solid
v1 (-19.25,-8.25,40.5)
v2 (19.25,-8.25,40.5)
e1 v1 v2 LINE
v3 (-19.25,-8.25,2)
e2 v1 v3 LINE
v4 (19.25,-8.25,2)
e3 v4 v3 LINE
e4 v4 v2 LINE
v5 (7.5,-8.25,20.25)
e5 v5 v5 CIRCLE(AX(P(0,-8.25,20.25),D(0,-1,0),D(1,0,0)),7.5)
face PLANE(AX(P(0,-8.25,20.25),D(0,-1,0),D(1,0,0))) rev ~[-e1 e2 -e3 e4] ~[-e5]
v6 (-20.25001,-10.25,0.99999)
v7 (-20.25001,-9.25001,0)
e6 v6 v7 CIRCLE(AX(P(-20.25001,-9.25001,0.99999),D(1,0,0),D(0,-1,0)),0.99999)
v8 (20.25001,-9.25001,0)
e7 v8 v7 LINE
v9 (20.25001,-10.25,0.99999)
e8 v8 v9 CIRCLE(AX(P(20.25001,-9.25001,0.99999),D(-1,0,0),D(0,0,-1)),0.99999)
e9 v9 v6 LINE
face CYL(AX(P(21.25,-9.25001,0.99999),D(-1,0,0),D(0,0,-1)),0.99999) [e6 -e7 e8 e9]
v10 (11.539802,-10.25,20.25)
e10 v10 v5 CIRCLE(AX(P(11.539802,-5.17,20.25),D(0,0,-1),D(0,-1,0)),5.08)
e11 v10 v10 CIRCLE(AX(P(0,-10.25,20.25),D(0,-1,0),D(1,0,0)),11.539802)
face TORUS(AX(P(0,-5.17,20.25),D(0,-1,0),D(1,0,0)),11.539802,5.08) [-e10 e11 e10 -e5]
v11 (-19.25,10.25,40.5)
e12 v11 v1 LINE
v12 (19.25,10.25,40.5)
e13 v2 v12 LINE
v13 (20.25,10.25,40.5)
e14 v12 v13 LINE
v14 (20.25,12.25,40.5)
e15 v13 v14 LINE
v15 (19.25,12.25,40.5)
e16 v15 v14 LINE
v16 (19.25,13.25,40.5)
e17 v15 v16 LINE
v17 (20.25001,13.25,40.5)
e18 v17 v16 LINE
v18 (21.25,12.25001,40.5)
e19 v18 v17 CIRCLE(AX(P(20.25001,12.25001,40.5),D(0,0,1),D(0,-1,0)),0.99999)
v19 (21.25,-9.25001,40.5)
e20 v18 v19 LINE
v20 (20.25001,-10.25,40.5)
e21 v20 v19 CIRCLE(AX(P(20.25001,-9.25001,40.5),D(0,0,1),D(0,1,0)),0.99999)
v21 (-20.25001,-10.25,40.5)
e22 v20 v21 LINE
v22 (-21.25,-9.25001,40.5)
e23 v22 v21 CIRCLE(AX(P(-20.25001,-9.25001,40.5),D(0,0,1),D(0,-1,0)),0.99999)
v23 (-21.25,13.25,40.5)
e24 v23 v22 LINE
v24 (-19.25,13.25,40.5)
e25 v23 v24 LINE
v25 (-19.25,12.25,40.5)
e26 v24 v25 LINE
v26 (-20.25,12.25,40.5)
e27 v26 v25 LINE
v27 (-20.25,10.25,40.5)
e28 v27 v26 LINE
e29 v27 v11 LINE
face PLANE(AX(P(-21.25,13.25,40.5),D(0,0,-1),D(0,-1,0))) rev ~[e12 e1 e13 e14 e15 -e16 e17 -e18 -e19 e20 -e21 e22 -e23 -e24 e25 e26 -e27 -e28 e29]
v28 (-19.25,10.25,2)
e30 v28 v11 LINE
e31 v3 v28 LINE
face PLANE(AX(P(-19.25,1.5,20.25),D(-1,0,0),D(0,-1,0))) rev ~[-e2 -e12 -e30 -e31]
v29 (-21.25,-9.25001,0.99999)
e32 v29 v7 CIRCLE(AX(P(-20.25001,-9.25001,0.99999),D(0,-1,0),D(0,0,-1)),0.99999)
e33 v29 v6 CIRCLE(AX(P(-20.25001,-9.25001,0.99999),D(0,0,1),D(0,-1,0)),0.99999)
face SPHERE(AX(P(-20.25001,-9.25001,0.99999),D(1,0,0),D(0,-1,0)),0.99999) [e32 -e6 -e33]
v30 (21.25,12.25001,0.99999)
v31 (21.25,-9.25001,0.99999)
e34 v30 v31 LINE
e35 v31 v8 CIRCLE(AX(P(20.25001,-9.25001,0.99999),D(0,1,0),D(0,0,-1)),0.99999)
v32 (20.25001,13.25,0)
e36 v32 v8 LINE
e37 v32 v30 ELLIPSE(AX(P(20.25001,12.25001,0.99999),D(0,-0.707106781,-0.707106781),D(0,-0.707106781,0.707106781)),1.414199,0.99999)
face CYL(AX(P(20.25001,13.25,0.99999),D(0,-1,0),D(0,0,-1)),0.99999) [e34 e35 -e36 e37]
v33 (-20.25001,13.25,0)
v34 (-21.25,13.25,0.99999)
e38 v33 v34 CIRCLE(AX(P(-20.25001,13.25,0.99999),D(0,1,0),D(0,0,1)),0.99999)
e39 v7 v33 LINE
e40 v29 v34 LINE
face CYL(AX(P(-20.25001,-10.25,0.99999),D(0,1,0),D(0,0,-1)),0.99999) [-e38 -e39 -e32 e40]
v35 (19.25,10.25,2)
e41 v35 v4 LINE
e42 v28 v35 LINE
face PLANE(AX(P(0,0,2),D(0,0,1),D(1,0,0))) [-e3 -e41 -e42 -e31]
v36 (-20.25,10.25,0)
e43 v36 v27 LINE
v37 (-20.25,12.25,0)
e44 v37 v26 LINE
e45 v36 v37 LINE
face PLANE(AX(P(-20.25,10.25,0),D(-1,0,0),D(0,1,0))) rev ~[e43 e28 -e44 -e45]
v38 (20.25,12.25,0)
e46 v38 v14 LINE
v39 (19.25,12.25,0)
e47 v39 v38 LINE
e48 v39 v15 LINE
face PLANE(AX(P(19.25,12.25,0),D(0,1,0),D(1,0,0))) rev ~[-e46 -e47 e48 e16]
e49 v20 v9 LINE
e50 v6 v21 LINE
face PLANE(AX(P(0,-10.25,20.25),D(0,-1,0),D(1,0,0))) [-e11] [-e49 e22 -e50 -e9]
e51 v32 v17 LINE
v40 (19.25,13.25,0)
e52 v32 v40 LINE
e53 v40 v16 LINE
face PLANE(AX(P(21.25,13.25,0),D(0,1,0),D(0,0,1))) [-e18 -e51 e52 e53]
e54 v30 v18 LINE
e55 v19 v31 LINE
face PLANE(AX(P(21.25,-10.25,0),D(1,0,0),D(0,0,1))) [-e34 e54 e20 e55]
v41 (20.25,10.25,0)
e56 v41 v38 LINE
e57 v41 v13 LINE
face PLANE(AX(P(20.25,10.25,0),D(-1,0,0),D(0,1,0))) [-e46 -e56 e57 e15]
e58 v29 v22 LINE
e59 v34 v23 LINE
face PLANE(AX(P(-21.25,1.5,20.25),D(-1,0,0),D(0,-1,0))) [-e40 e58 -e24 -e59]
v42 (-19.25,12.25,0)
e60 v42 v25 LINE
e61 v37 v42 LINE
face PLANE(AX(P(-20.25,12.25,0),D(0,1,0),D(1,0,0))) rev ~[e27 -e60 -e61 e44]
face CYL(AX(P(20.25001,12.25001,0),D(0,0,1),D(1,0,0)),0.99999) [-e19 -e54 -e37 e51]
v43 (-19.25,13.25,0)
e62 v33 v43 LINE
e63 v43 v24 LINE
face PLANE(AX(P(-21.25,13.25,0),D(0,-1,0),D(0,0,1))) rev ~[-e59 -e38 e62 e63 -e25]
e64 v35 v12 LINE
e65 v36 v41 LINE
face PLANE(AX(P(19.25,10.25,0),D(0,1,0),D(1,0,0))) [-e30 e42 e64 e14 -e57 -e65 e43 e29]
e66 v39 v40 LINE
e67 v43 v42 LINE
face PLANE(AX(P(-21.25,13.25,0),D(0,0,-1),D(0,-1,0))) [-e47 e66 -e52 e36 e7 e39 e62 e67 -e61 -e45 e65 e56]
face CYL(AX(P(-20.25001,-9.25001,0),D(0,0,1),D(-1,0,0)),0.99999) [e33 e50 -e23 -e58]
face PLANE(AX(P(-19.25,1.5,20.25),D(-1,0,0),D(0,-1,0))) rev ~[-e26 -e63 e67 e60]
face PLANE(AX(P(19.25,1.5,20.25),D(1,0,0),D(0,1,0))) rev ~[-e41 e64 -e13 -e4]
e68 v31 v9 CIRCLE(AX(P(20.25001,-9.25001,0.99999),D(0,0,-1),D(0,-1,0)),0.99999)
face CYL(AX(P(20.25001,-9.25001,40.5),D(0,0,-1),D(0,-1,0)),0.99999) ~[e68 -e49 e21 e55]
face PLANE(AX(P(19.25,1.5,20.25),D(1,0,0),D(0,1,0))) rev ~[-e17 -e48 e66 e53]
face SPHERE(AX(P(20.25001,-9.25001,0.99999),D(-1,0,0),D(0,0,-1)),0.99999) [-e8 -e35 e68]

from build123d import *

# Parameters (mm, degrees)
F2_W      = 42.5
F2_H      = 40.5
F2_R      = 7.5
F8_DEPTH  = 2
F6_W      = 23.5
F6_H      = 40.5
F9_DEPTH  = 2
F5_W      = 23.5
F5_H      = 40.5
F10_DEPTH = 2
F0_W      = 42.5
F0_H      = 20.5
F11_DEPTH = 2
F7_W      = 1
F7_H      = 2
F12_DEPTH = 38.5
F13_DEPTH = 40.5
F14_R     = 0.99999


# Not quite as in the source:
# - a fillet or chamfer that OpenCascade refuses, or shapes differently, is made with other operations: its cross-section is extruded or revolved along the edge and cut away or added
# - a fillet or chamfer is up to 0.001 mm smaller than in the source, because OpenCascade refuses the exact size


with BuildPart() as f8:
    # F2 (on line) → F8 (new body)
    with BuildSketch(Plane.XZ.offset(10.25)):
        with Locations((0, 20.25)):
            Rectangle(F2_W, F2_H)
        with Locations((0, 20.25)):
            Circle(F2_R, mode=Mode.SUBTRACT)
    extrude(amount=-F8_DEPTH)

    # F6 (on line) → F9 (join)
    with BuildSketch(Plane(origin=(-21.25, 0, 0), x_dir=(0, -1, 0), z_dir=(-1, 0, 0))):
        with Locations((-1.5, 20.25)):
            Rectangle(F6_W, F6_H)
    extrude(amount=-F9_DEPTH)

    # F5 (on line) → F10 (join)
    with BuildSketch(Plane.YZ.offset(21.25)):
        with Locations((1.5, 20.25)):
            Rectangle(F5_W, F5_H)
    extrude(amount=-F10_DEPTH)

    # F0 (on Top) → F11 (join)
    with BuildSketch(Plane.XY):
        Rectangle(F0_W, F0_H)
    extrude(amount=F11_DEPTH)

    # F7 (on Top) → F12 (cut)
    with BuildSketch(Plane.XY):
        with Locations((-19.75, 11.25)):
            Rectangle(F7_W, F7_H)
        with Locations((19.75, 11.25)):
            Rectangle(F7_W, F7_H)
    extrude(amount=-F12_DEPTH, mode=Mode.SUBTRACT)

    # F7 (on Top) → F13 (cut)
    with BuildSketch(Plane.XY):
        with Locations((19.75, 11.25)):
            Rectangle(F7_W, F7_H)
        with Locations((-19.75, 11.25)):
            Rectangle(F7_W, F7_H)
    extrude(amount=F13_DEPTH, mode=Mode.SUBTRACT)

    # F14 (radius 1 in the source; OpenCascade refuses exactly that, so slightly less here)
    f14_edges = [f8.edges().sort_by_distance(p)[0] for p in [
        (0, -10.25, 0),
        (21.25, 1.5, 0),
        (21.25, 13.25, 20.25),
        (21.25, -10.25, 20.25),
        (-21.25, -10.25, 20.25),
        (-21.25, 1.5, 0),
    ]]
    fillet(f14_edges, radius=F14_R)

    # F15: fillet of radius 5.08 on 1 edges, made by hand

    # F15_s1 → F15_t2 (revolve, cut)
    with BuildSketch(Plane.XY.offset(20.25)):
        with BuildLine():
            ThreePointArc((11.5398019753, -10.25), (9.2859164414, -9.7226256161), (7.5, -8.25))
            Line((7.5, -8.25), (7.5, -10.25))
            Line((7.5, -10.25), (11.5398019753, -10.25))
        make_face()
    revolve(axis=Axis((0, -10.25, 20.25), (0, -1, 0)), mode=Mode.SUBTRACT)


solid = f8.part
